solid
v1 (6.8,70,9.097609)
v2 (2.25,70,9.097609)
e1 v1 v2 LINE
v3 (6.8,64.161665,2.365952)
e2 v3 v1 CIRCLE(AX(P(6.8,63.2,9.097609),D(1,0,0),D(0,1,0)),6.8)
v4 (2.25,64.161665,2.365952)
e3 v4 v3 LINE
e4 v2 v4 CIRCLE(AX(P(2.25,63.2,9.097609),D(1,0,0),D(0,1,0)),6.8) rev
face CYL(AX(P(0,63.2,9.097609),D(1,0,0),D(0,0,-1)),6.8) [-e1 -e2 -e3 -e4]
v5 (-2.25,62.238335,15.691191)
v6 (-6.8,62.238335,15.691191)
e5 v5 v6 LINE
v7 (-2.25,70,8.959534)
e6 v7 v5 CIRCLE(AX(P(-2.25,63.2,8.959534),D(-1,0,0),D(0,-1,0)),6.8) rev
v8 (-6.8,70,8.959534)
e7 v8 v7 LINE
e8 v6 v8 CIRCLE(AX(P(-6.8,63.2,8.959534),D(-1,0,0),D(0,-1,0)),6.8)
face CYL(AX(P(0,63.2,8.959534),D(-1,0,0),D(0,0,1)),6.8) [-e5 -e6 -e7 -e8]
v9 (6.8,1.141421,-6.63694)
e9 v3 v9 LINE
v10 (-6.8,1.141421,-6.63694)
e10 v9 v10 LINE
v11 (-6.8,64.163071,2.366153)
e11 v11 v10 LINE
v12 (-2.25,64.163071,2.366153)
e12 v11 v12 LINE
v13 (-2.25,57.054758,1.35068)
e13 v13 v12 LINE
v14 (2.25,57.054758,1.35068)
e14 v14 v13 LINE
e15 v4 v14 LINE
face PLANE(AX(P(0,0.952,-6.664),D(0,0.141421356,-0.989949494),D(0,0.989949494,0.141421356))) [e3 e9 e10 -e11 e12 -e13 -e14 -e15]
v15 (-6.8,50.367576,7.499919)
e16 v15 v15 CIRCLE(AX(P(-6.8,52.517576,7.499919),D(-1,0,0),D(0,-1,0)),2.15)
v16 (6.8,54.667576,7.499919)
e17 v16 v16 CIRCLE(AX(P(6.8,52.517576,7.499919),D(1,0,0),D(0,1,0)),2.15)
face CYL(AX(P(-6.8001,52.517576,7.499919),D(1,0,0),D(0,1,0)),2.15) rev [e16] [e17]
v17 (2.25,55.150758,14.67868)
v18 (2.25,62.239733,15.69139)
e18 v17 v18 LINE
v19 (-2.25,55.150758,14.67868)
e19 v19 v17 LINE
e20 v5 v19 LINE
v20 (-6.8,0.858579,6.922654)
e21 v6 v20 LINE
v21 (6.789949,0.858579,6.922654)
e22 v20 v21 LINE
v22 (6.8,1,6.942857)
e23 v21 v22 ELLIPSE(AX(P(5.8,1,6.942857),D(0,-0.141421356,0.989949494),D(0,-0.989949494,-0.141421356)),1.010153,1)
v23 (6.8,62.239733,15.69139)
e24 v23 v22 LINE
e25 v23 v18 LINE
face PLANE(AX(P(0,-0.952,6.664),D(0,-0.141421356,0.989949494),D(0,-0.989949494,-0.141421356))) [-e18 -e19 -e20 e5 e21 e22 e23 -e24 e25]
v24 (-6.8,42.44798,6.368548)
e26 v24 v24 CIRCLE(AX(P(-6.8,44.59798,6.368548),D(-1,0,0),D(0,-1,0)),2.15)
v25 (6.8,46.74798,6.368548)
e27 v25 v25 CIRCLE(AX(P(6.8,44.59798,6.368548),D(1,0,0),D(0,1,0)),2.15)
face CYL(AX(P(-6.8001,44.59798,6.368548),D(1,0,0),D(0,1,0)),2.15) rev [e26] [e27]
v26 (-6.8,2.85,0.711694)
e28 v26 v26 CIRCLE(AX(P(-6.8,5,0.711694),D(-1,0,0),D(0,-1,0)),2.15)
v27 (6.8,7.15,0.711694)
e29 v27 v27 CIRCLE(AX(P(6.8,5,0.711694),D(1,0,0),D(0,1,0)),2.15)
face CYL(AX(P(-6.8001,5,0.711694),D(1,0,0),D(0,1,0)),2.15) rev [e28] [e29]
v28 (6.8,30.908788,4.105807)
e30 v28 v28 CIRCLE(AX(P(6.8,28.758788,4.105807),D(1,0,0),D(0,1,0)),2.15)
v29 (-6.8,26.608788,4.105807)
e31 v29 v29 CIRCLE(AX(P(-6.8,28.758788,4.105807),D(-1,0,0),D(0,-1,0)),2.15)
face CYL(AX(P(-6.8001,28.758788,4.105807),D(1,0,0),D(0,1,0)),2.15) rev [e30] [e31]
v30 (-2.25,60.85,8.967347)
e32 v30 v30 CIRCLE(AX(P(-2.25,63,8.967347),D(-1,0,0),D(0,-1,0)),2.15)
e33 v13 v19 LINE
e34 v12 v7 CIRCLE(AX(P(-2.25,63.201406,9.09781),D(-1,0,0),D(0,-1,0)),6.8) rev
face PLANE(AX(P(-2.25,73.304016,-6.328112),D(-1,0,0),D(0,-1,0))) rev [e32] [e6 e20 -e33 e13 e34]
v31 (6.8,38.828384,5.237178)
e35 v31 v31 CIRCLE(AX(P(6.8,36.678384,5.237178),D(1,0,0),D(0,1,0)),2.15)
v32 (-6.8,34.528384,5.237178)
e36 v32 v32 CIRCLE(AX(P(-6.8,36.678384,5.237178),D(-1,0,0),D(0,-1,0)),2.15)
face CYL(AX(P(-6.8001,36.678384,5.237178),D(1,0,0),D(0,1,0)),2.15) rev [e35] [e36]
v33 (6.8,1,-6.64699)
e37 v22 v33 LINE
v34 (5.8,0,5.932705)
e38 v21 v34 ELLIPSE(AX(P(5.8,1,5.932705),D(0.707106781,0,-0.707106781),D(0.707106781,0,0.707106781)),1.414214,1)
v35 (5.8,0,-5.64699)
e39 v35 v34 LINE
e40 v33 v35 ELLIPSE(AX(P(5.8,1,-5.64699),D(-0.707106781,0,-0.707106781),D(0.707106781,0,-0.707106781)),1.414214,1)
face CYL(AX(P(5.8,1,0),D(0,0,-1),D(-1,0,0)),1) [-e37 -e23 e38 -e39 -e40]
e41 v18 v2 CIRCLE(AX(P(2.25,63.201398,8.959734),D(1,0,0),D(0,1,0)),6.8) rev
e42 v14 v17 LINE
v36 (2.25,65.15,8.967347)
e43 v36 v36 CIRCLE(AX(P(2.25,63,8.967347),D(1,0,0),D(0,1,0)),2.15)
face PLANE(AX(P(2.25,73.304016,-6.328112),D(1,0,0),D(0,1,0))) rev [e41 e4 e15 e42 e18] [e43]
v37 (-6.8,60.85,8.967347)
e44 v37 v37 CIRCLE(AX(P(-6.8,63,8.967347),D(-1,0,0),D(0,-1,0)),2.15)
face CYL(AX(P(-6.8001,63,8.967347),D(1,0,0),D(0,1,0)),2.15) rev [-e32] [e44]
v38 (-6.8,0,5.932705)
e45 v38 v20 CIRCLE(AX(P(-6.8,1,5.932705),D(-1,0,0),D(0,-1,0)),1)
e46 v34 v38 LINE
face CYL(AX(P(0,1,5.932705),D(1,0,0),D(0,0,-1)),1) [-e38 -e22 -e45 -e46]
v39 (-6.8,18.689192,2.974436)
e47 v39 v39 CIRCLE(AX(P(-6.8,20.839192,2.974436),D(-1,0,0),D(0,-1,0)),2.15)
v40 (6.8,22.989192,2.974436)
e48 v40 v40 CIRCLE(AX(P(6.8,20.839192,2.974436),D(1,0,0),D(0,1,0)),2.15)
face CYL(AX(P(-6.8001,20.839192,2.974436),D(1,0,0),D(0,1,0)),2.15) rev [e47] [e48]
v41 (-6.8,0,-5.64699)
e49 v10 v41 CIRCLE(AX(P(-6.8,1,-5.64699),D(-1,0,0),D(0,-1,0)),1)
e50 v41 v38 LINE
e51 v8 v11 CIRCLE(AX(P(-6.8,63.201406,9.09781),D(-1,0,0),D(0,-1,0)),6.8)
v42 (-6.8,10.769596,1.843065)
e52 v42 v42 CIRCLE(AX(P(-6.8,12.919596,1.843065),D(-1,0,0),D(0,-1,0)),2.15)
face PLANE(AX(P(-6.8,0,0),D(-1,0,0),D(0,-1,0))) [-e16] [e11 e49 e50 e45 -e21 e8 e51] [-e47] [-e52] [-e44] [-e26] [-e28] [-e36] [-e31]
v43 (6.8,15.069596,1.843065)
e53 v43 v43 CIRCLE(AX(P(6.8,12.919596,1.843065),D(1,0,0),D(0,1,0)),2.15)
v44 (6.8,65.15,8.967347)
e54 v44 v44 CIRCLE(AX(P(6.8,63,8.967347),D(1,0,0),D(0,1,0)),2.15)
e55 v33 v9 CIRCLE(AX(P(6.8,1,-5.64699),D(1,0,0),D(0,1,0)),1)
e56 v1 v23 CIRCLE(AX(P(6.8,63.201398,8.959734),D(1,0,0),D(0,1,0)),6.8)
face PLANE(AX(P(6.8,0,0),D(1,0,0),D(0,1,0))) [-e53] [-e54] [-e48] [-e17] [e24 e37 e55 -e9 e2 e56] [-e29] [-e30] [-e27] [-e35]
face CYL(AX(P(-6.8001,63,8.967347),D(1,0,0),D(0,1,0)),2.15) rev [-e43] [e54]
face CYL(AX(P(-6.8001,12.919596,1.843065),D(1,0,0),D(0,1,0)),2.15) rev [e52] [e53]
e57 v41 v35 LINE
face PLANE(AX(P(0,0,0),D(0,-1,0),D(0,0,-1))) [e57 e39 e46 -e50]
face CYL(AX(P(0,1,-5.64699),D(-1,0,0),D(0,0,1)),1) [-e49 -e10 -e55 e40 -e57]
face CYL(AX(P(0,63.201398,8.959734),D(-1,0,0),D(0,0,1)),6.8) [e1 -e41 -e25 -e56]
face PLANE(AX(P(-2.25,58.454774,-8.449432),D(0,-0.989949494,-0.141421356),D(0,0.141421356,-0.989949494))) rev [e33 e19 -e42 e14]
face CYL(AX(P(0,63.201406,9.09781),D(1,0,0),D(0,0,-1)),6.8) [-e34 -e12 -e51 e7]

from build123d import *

# Parameters (mm, degrees)
CUT_EXTRUDE_3_DEPTH      = 73.537615195
CUT_EXTRUDE_3_DEPTH_BACK = 73.537615195
SKETCH_6_W               = 4.5
SKETCH_6_H               = 15
FILLET_1_R               = 6.8
SKETCH_4_R               = 2.15
CUT_EXTRUDE_1_DEPTH      = 74.261176759
SKETCH_5_R               = 2.15
CUT_EXTRUDE_2_DEPTH      = 74.261176759
PATTERN_LINEAR_1_COUNT   = 7
PATTERN_LINEAR_1_PITCH   = 8
FILLET_2_R               = 6.8
FILLET_3_R               = 1


with BuildPart() as part:
    # 草图2 → 放样1 section 0
    with BuildSketch(Plane(origin=(0, 70, 0), x_dir=(1, 0, 0), z_dir=(0, 1, 0))):
        with BuildLine():
            Line((-6.8, -16.8), (6.8, -16.8))
            Line((6.8, -16.8), (6.8, -3.2))
            Line((6.8, -3.2), (-6.8, -3.2))
            Line((-6.8, -3.2), (-6.8, -16.8))
        make_face()
    # 草图1 → 放样1 section 1
    with BuildSketch(Plane(origin=(0, 0, 0), x_dir=(1, 0, 0), z_dir=(0, 1, 0))):
        with BuildLine():
            Line((-6.8, -6.8), (6.8, -6.8))
            Line((6.8, -6.8), (6.8, 6.8))
            Line((6.8, 6.8), (-6.8, 6.8))
            Line((-6.8, 6.8), (-6.8, -6.8))
        make_face()
    loft()

    # 草图6 → 切除-拉伸3 (cut, two sides: drawn at the far end of the back side and taken through both)
    with BuildSketch(Plane(origin=(0, -0.952, 6.664), x_dir=(1, 0, 0), z_dir=(0, -0.14142135623730942, 0.9899494936611666)).offset(-CUT_EXTRUDE_3_DEPTH_BACK)):
        with Locations((0, 64.172343341)):
            Rectangle(SKETCH_6_W, SKETCH_6_H)
    extrude(amount=CUT_EXTRUDE_3_DEPTH + CUT_EXTRUDE_3_DEPTH_BACK, mode=Mode.SUBTRACT)

    # 圆角1
    fillet_1_edges = [part.edges().sort_by_distance(p)[0] for p in [
        (4.525, 70, 3.2),
        (-4.525, 70, 16.8),
    ]]
    fillet(fillet_1_edges, radius=FILLET_1_R)

    # 草图4 → 切除-拉伸1 (cut, through all)
    with BuildSketch(Plane(origin=(6.8, 0, 0), x_dir=(0, 0, -1), z_dir=(1, 0, 0))):
        with Locations(Location((-8.967347222, 63, 0), (0, 0, 270))):
            Circle(SKETCH_4_R)
    extrude(amount=-CUT_EXTRUDE_1_DEPTH, mode=Mode.SUBTRACT)

    # 草图5 → 切除-拉伸2 (cut, through all)
    with BuildSketch(Plane(origin=(6.8, 0, 0), x_dir=(0, 0, -1), z_dir=(1, 0, 0))):
        with Locations(Location((-0.711694224, 5, 0), (0, 0, 90))):
            Circle(SKETCH_5_R)
    cut_extrude_2 = extrude(amount=-CUT_EXTRUDE_2_DEPTH, mode=Mode.SUBTRACT)

    # 阵列(线性)1: 切除-拉伸2 ×7
    with Locations(*[Vector(0, 0.9899494936611666, 0.14142135623730945) * (i * PATTERN_LINEAR_1_PITCH) for i in range(1, PATTERN_LINEAR_1_COUNT)]):
        add(cut_extrude_2, mode=Mode.SUBTRACT)

    # 圆角2
    # the kernel refuses this fillet: 6.8 mm, written as the material it takes off along each edge
    with BuildSketch(Plane(origin=(12.490471053, 70, 3.2), x_dir=(0, -0.9899494936611667, -0.14142135623730884), z_dir=(-1, 0, 0))) as fillet_2_piece_1:
        with BuildLine():
            CenterArc((5.896188421, 6.8), FILLET_2_R, 189.295271006, 80.704728994)
            Line((-0.814521127, 5.701647891), (-0.948735318, 5.679680849))
            ThreePointArc((-0.948735318, 5.679680849), (-0.541893695, 2.831590641), (-0.134633131, -0.019233304))
            Line((-0.134633131, -0.019233304), (0, -0.136))
            Line((0, -0.136), (5.896188421, -0.136))
            Line((5.896188421, -0.136), (5.896188421, 0))
        make_face()
    extrude(amount=34.030942106, mode=Mode.SUBTRACT)
    with BuildSketch(Plane(origin=(-17.347634455, 70, 16.8), x_dir=(0, -0.9899494936611665, -0.14142135623730936), z_dir=(1, 0, 0))) as fillet_2_piece_2:
        with BuildLine():
            CenterArc((7.839053782, 6.8), FILLET_2_R, 173.031690524, 96.968309476)
            Line((1.089282619, 7.624978336), (0.954287196, 7.641477903))
            ThreePointArc((0.954287196, 7.641477903), (0.410008179, 3.831722473), (-0.134633131, 0.019233304))
            Line((-0.134633131, 0.019233304), (0, -0.136))
            Line((0, -0.136), (7.839053782, -0.136))
            Line((7.839053782, -0.136), (7.839053782, 0))
        make_face()
    extrude(amount=43.745268909, mode=Mode.SUBTRACT)

    # 圆角3
    fillet_3_edges = [part.edges().sort_by_distance(p)[0] for p in [
        (0, 0, -6.8),
        (6.8, 0, 0),
        (0, 0, 6.8),
    ]]
    fillet(fillet_3_edges, radius=FILLET_3_R)


solid = part.part
